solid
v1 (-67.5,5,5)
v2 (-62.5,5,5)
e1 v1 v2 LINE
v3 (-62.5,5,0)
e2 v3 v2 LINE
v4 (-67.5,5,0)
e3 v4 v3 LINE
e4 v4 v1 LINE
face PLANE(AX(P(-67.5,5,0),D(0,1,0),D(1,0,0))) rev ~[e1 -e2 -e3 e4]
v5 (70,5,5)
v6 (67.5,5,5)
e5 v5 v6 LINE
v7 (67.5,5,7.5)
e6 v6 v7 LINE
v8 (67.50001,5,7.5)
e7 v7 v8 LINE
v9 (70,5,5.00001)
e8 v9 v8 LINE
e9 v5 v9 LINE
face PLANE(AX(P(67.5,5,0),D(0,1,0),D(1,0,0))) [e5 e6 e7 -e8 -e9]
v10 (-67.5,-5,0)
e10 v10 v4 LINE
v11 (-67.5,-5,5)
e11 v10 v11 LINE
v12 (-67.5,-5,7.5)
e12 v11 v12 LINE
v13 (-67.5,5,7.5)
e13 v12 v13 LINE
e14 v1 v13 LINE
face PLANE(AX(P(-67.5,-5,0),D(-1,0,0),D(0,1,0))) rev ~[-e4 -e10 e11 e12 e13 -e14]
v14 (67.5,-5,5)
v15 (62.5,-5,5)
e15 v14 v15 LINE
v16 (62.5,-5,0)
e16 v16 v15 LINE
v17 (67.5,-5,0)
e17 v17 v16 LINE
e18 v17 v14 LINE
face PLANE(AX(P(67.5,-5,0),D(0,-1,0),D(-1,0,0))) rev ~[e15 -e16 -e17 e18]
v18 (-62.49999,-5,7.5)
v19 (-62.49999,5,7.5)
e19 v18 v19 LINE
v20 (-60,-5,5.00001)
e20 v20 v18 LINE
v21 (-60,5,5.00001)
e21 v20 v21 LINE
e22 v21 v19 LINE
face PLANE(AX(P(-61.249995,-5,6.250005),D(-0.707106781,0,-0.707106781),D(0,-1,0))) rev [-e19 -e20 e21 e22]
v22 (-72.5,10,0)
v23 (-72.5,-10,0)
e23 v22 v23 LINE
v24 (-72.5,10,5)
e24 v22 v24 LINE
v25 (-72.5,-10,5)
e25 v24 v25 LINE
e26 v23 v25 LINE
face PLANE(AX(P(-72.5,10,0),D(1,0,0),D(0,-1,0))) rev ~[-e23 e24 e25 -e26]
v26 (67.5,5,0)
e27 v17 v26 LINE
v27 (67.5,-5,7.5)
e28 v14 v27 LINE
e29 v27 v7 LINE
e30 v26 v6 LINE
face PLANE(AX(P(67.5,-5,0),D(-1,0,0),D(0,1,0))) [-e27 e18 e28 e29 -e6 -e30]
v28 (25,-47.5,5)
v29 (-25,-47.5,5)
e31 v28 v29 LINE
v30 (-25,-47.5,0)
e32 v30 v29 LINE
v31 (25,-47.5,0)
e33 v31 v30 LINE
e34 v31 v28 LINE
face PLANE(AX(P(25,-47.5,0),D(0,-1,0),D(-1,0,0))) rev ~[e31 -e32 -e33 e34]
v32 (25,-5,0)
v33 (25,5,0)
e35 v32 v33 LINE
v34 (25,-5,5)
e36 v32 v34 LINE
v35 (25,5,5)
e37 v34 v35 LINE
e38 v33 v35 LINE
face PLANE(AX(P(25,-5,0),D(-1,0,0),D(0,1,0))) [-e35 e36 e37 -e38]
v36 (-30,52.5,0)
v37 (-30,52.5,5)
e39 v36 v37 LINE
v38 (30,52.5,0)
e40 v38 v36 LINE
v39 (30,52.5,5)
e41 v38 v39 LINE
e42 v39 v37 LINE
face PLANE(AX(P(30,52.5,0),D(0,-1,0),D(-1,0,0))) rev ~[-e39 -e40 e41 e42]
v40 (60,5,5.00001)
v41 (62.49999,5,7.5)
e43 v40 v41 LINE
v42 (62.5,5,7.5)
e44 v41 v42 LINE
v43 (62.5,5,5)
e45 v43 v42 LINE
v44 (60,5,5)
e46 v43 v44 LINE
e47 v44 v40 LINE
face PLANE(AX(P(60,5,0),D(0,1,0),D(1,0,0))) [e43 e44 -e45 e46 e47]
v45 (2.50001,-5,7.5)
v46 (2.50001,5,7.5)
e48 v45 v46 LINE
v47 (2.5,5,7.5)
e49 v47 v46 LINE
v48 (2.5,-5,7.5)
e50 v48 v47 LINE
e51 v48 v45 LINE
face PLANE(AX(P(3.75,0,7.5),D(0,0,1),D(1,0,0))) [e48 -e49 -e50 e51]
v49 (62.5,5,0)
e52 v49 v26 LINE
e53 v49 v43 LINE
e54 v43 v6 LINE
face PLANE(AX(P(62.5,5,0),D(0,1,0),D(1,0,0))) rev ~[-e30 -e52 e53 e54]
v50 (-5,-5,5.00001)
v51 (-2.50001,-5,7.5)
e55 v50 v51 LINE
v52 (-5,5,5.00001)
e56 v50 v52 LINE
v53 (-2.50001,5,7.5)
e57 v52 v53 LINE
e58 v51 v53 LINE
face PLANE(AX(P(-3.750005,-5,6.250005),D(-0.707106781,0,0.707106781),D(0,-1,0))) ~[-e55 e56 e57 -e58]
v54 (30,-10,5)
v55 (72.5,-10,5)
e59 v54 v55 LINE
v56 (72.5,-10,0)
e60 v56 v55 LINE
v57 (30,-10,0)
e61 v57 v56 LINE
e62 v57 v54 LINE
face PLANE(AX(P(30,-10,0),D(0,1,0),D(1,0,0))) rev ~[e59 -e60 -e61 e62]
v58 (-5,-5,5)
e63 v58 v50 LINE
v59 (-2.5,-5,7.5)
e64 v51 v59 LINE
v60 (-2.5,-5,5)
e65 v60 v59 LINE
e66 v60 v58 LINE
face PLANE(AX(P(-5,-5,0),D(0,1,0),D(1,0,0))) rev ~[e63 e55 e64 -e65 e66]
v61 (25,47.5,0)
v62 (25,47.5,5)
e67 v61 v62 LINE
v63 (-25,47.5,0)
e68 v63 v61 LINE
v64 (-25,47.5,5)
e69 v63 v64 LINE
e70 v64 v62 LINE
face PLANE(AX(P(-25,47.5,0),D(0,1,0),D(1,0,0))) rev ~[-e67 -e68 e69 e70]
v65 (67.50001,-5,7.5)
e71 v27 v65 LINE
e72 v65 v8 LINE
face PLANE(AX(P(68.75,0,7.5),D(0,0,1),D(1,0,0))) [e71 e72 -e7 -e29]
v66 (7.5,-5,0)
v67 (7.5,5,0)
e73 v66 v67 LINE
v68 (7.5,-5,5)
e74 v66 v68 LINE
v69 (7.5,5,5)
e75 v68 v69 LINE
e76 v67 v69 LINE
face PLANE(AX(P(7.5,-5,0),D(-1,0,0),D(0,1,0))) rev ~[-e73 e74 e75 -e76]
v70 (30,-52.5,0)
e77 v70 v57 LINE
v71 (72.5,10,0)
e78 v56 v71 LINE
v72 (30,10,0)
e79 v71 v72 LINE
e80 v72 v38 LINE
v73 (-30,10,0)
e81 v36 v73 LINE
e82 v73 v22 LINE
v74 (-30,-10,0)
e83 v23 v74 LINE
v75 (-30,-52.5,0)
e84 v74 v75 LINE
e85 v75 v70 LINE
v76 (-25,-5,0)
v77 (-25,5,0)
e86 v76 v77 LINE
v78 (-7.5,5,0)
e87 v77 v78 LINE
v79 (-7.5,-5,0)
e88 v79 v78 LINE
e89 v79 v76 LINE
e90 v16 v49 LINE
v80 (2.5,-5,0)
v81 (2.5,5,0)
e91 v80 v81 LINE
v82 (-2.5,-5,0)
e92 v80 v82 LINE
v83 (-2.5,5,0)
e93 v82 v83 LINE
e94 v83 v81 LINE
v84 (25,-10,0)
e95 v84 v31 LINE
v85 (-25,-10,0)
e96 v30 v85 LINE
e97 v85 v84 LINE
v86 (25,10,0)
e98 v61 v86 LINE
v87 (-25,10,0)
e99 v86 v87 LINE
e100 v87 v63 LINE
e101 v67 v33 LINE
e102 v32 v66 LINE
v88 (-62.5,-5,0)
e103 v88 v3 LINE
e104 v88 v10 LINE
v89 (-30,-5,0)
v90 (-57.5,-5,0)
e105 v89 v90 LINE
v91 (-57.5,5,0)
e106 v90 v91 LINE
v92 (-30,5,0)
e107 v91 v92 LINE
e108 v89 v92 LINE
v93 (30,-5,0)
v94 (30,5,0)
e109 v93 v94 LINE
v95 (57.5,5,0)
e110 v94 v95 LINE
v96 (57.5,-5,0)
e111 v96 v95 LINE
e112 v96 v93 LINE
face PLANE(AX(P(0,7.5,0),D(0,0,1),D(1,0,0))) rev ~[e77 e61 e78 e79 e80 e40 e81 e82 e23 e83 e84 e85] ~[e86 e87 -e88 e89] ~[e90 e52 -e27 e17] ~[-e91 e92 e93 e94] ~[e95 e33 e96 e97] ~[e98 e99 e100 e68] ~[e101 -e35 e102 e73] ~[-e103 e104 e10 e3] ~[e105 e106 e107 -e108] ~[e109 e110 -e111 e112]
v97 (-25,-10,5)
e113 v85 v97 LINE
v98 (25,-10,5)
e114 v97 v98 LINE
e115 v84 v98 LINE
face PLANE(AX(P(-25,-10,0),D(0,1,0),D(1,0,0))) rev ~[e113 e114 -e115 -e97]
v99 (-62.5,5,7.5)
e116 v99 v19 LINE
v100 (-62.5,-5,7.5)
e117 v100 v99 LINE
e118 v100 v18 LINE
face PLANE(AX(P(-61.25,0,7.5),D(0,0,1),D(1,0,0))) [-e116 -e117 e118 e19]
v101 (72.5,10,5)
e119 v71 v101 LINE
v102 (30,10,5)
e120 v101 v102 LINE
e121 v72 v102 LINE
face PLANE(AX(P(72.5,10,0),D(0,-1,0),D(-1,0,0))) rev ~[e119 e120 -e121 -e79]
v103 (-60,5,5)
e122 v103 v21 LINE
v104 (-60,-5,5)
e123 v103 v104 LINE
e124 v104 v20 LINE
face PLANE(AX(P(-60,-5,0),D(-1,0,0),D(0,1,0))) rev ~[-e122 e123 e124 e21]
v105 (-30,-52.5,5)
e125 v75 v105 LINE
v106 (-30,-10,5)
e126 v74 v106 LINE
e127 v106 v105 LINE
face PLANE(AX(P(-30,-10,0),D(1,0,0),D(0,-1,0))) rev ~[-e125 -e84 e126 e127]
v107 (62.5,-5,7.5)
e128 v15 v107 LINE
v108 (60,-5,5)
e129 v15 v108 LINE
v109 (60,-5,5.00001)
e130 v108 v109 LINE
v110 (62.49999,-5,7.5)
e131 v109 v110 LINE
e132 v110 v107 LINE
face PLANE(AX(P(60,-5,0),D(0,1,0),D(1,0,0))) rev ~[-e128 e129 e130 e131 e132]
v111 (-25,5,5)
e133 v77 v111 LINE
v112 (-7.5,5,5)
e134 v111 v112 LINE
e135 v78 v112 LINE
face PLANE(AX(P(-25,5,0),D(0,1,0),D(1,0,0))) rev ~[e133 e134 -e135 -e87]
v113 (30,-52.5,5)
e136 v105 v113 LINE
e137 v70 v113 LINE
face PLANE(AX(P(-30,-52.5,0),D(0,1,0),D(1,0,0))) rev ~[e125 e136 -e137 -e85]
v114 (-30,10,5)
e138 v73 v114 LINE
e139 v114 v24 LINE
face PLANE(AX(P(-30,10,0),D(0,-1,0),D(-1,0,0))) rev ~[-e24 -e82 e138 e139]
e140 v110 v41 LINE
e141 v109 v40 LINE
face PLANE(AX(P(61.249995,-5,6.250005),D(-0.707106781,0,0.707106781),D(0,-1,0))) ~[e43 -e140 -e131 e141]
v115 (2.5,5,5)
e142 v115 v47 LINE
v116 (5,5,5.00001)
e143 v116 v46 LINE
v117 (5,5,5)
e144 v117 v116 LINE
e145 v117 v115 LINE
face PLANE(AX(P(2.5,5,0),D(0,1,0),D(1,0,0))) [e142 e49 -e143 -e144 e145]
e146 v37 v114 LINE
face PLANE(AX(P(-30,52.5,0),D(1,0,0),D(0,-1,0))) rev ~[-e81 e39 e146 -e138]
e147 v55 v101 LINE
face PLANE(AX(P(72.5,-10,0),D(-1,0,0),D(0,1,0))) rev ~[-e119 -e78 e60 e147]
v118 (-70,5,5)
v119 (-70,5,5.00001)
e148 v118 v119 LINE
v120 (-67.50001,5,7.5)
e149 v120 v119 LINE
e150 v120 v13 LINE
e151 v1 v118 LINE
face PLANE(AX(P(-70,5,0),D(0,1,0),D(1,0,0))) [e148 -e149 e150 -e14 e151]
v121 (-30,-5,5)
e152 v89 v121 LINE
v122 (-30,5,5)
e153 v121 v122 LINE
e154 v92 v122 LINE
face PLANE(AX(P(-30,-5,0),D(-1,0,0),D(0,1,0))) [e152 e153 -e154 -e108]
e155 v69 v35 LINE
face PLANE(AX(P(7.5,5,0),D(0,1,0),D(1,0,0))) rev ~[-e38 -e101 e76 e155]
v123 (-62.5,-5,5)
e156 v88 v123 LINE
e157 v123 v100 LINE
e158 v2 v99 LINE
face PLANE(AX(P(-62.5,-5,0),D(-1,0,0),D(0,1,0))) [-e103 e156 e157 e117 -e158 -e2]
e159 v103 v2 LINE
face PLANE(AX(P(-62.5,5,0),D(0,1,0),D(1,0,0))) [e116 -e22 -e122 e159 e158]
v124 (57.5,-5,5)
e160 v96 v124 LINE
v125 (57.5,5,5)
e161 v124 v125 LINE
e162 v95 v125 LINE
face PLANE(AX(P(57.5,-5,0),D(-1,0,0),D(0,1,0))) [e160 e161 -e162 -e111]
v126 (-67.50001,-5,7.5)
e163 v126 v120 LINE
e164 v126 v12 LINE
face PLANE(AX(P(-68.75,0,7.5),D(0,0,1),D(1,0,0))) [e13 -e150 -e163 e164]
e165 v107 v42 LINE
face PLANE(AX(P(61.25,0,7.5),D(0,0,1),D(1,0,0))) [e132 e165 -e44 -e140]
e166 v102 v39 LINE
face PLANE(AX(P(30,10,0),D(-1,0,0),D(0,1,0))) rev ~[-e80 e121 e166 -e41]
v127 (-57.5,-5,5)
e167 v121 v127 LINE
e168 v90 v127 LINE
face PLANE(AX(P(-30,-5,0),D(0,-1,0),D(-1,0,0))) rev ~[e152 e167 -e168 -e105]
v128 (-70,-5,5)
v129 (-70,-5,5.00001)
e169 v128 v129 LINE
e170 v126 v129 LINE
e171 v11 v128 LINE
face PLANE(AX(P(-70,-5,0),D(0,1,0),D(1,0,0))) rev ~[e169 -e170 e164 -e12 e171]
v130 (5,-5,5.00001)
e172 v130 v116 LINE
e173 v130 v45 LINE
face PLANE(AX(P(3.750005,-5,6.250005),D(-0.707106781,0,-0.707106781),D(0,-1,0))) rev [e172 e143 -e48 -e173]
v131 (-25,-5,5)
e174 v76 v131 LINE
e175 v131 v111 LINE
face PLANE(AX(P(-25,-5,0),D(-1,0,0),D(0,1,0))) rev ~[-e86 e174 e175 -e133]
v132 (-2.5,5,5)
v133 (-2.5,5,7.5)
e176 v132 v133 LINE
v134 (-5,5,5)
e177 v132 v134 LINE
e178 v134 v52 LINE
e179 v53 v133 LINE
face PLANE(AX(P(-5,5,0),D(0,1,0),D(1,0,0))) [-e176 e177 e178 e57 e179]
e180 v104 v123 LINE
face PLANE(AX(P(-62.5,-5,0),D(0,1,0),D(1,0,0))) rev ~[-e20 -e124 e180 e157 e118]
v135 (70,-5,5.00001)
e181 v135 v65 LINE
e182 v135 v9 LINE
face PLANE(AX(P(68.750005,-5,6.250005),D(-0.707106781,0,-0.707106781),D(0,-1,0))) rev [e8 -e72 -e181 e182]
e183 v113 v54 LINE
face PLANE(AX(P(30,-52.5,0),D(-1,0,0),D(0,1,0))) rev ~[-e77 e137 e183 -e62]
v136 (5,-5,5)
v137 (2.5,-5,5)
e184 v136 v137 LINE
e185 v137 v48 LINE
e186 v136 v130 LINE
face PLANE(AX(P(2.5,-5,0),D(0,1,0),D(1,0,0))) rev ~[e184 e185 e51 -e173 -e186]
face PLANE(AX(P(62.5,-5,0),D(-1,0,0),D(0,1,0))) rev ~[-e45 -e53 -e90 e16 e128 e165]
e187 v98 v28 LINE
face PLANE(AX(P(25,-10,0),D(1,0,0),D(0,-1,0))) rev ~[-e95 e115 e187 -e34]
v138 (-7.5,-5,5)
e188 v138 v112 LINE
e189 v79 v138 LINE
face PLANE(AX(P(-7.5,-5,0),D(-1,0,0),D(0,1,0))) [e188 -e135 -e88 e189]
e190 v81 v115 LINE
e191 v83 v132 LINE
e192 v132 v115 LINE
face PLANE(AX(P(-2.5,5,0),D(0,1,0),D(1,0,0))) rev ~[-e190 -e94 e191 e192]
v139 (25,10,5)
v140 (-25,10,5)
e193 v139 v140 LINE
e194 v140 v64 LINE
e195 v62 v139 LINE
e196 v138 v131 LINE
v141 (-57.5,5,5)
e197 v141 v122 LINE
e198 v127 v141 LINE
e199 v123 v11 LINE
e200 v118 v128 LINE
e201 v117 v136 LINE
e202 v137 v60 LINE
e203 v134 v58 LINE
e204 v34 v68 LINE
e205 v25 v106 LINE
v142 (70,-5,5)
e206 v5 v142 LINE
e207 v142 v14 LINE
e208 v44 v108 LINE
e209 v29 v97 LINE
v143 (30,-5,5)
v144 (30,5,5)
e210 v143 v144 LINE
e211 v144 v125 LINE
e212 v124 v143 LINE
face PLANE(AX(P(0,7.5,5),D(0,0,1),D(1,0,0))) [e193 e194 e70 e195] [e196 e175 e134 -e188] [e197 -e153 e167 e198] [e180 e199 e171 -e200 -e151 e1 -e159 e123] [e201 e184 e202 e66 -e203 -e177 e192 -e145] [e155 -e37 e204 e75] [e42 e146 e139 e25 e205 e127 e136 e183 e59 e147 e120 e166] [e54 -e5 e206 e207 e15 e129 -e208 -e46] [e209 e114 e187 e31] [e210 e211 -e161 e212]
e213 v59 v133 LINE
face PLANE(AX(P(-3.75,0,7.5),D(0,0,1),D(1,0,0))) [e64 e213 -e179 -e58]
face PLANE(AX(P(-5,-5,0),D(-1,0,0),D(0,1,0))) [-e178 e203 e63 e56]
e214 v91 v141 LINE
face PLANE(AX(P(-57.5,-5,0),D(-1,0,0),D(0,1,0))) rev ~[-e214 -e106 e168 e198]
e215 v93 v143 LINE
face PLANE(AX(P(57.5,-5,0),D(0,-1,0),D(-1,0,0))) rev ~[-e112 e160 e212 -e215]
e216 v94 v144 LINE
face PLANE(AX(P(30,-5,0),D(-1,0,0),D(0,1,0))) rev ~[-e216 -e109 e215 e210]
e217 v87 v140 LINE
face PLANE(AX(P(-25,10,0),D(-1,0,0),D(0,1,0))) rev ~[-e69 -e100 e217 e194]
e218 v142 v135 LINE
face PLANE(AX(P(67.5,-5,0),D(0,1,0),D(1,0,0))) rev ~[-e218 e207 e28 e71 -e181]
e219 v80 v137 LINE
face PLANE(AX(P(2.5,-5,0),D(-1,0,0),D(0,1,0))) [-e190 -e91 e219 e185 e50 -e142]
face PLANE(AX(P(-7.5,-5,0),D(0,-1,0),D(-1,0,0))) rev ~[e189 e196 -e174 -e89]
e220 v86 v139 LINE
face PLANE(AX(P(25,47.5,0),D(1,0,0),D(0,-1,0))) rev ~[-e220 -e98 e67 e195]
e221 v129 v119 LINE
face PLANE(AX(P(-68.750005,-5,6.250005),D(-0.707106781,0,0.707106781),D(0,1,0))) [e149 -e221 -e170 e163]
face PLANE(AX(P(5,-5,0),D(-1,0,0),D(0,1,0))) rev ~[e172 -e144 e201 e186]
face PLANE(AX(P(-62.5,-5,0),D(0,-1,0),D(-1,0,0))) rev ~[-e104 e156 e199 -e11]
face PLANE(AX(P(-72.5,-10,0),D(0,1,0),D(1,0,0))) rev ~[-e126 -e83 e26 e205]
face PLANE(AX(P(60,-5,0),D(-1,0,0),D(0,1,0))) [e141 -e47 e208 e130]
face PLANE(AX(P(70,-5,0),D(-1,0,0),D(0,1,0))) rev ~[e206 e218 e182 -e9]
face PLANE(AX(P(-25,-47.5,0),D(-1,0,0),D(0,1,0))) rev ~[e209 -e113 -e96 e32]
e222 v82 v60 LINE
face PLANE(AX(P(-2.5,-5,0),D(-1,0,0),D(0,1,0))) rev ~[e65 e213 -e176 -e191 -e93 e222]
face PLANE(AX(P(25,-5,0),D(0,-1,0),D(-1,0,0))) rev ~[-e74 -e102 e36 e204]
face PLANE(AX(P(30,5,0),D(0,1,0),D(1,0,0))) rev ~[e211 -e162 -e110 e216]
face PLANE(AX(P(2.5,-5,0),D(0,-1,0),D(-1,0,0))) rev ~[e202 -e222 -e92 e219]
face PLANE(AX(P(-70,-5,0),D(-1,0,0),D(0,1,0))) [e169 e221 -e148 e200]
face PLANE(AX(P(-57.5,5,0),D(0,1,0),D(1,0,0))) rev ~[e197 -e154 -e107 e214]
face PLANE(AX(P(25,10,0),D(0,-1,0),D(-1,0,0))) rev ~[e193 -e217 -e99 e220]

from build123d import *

# Parameters (mm, degrees)
F0_W     = 5
F0_H     = 5
F0_W_2   = 2.5
F0_H_2   = 10
F1_DEPTH = 5
F2_DEPTH = 7.5
F3_SIZE  = 2.49999


# Not quite as in the source:
# - a fillet or chamfer is up to 0.001 mm smaller than in the source, because OpenCascade refuses the exact size
# - a feature names something its author has since deleted; it is built from what else it names


with BuildPart() as f1:
    # F0 (on Top) → F1 (new body)
    with BuildSketch(Plane.XY):
        Polygon((-5, 5), (-2.5, 5), (2.5, 5), (5, 5), (7.5, 5), (25, 5), (25, 10), (-25, 10), (-25, 5), (-7.5, 5), align=None)
        Polygon((-57.5, 5), (-30, 5), (-30, 10), (-72.5, 10), (-72.5, 5), (-70, 5), (-67.5, 5), (-62.5, 5), (-60, 5), align=None)
        Polygon((-30, 10), (-25, 10), (-25, 47.5), (25, 47.5), (25, 10), (30, 10), (30, 52.5), (-30, 52.5), align=None)
        with Locations((-27.5, 7.5)):
            Rectangle(F0_W, F0_H)
        with Locations((-27.5, -7.5)):
            Rectangle(F0_W, F0_H)
        Polygon((-25, -47.5), (-25, -10), (-30, -10), (-30, -52.5), (30, -52.5), (30, -10), (25, -10), (25, -47.5), align=None)
        with Locations((27.5, 7.5)):
            Rectangle(F0_W, F0_H)
        Polygon((30, 10), (30, 5), (57.5, 5), (60, 5), (62.5, 5), (67.5, 5), (70, 5), (72.5, 5), (72.5, 10), align=None)
        with Locations((27.5, -7.5)):
            Rectangle(F0_W, F0_H)
        with Locations((61.25, 0)):
            Rectangle(F0_W_2, F0_H_2)
        with Locations((68.75, 0)):
            Rectangle(F0_W_2, F0_H_2)
        Polygon((2.5, -5), (-2.5, -5), (-5, -5), (-7.5, -5), (-25, -5), (-25, -10), (25, -10), (25, -5), (7.5, -5), (5, -5), align=None)
        with Locations((-3.75, 0)):
            Rectangle(F0_W_2, F0_H_2)
        with Locations((3.75, 0)):
            Rectangle(F0_W_2, F0_H_2)
        Polygon((-30, -10), (-30, -5), (-57.5, -5), (-60, -5), (-62.5, -5), (-67.5, -5), (-70, -5), (-72.5, -5), (-72.5, -10), align=None)
        with Locations((-68.75, 0)):
            Rectangle(F0_W_2, F0_H_2)
        with Locations((-61.25, 0)):
            Rectangle(F0_W_2, F0_H_2)
        with Locations((-71.25, 0)):
            Rectangle(F0_W_2, F0_H_2)
        with Locations((-58.75, 0)):
            Rectangle(F0_W_2, F0_H_2)
        Polygon((57.5, -5), (30, -5), (30, -10), (72.5, -10), (72.5, -5), (70, -5), (67.5, -5), (62.5, -5), (60, -5), align=None)
        with Locations((58.75, 0)):
            Rectangle(F0_W_2, F0_H_2)
        with Locations((71.25, 0)):
            Rectangle(F0_W_2, F0_H_2)
        with Locations((6.25, 0)):
            Rectangle(F0_W_2, F0_H_2)
        with Locations((-6.25, 0)):
            Rectangle(F0_W_2, F0_H_2)
        with Locations((-27.5, 0)):
            Rectangle(F0_W, F0_H_2)
        with Locations((27.5, 0)):
            Rectangle(F0_W, F0_H_2)
    extrude(amount=F1_DEPTH)

    # F0 (on Top) → F2 (join)
    with BuildSketch(Plane.XY):
        with Locations((-68.75, 0)):
            Rectangle(F0_W_2, F0_H_2)
        with Locations((-61.25, 0)):
            Rectangle(F0_W_2, F0_H_2)
        with Locations((-3.75, 0)):
            Rectangle(F0_W_2, F0_H_2)
        with Locations((3.75, 0)):
            Rectangle(F0_W_2, F0_H_2)
        with Locations((61.25, 0)):
            Rectangle(F0_W_2, F0_H_2)
        with Locations((68.75, 0)):
            Rectangle(F0_W_2, F0_H_2)
    extrude(amount=F2_DEPTH)

    # F3 (size 2.5 in the source; OpenCascade refuses exactly that, so slightly less here)
    f3_edges = [f1.edges().sort_by_distance(p)[0] for p in [
        (70, 0, 7.5),
        (60, 0, 7.5),
        (5, 0, 7.5),
        (-5, 0, 7.5),
        (-60, 0, 7.5),
        (-70, 0, 7.5),
    ]]
    chamfer(f3_edges, length=F3_SIZE)


solid = f1.part
